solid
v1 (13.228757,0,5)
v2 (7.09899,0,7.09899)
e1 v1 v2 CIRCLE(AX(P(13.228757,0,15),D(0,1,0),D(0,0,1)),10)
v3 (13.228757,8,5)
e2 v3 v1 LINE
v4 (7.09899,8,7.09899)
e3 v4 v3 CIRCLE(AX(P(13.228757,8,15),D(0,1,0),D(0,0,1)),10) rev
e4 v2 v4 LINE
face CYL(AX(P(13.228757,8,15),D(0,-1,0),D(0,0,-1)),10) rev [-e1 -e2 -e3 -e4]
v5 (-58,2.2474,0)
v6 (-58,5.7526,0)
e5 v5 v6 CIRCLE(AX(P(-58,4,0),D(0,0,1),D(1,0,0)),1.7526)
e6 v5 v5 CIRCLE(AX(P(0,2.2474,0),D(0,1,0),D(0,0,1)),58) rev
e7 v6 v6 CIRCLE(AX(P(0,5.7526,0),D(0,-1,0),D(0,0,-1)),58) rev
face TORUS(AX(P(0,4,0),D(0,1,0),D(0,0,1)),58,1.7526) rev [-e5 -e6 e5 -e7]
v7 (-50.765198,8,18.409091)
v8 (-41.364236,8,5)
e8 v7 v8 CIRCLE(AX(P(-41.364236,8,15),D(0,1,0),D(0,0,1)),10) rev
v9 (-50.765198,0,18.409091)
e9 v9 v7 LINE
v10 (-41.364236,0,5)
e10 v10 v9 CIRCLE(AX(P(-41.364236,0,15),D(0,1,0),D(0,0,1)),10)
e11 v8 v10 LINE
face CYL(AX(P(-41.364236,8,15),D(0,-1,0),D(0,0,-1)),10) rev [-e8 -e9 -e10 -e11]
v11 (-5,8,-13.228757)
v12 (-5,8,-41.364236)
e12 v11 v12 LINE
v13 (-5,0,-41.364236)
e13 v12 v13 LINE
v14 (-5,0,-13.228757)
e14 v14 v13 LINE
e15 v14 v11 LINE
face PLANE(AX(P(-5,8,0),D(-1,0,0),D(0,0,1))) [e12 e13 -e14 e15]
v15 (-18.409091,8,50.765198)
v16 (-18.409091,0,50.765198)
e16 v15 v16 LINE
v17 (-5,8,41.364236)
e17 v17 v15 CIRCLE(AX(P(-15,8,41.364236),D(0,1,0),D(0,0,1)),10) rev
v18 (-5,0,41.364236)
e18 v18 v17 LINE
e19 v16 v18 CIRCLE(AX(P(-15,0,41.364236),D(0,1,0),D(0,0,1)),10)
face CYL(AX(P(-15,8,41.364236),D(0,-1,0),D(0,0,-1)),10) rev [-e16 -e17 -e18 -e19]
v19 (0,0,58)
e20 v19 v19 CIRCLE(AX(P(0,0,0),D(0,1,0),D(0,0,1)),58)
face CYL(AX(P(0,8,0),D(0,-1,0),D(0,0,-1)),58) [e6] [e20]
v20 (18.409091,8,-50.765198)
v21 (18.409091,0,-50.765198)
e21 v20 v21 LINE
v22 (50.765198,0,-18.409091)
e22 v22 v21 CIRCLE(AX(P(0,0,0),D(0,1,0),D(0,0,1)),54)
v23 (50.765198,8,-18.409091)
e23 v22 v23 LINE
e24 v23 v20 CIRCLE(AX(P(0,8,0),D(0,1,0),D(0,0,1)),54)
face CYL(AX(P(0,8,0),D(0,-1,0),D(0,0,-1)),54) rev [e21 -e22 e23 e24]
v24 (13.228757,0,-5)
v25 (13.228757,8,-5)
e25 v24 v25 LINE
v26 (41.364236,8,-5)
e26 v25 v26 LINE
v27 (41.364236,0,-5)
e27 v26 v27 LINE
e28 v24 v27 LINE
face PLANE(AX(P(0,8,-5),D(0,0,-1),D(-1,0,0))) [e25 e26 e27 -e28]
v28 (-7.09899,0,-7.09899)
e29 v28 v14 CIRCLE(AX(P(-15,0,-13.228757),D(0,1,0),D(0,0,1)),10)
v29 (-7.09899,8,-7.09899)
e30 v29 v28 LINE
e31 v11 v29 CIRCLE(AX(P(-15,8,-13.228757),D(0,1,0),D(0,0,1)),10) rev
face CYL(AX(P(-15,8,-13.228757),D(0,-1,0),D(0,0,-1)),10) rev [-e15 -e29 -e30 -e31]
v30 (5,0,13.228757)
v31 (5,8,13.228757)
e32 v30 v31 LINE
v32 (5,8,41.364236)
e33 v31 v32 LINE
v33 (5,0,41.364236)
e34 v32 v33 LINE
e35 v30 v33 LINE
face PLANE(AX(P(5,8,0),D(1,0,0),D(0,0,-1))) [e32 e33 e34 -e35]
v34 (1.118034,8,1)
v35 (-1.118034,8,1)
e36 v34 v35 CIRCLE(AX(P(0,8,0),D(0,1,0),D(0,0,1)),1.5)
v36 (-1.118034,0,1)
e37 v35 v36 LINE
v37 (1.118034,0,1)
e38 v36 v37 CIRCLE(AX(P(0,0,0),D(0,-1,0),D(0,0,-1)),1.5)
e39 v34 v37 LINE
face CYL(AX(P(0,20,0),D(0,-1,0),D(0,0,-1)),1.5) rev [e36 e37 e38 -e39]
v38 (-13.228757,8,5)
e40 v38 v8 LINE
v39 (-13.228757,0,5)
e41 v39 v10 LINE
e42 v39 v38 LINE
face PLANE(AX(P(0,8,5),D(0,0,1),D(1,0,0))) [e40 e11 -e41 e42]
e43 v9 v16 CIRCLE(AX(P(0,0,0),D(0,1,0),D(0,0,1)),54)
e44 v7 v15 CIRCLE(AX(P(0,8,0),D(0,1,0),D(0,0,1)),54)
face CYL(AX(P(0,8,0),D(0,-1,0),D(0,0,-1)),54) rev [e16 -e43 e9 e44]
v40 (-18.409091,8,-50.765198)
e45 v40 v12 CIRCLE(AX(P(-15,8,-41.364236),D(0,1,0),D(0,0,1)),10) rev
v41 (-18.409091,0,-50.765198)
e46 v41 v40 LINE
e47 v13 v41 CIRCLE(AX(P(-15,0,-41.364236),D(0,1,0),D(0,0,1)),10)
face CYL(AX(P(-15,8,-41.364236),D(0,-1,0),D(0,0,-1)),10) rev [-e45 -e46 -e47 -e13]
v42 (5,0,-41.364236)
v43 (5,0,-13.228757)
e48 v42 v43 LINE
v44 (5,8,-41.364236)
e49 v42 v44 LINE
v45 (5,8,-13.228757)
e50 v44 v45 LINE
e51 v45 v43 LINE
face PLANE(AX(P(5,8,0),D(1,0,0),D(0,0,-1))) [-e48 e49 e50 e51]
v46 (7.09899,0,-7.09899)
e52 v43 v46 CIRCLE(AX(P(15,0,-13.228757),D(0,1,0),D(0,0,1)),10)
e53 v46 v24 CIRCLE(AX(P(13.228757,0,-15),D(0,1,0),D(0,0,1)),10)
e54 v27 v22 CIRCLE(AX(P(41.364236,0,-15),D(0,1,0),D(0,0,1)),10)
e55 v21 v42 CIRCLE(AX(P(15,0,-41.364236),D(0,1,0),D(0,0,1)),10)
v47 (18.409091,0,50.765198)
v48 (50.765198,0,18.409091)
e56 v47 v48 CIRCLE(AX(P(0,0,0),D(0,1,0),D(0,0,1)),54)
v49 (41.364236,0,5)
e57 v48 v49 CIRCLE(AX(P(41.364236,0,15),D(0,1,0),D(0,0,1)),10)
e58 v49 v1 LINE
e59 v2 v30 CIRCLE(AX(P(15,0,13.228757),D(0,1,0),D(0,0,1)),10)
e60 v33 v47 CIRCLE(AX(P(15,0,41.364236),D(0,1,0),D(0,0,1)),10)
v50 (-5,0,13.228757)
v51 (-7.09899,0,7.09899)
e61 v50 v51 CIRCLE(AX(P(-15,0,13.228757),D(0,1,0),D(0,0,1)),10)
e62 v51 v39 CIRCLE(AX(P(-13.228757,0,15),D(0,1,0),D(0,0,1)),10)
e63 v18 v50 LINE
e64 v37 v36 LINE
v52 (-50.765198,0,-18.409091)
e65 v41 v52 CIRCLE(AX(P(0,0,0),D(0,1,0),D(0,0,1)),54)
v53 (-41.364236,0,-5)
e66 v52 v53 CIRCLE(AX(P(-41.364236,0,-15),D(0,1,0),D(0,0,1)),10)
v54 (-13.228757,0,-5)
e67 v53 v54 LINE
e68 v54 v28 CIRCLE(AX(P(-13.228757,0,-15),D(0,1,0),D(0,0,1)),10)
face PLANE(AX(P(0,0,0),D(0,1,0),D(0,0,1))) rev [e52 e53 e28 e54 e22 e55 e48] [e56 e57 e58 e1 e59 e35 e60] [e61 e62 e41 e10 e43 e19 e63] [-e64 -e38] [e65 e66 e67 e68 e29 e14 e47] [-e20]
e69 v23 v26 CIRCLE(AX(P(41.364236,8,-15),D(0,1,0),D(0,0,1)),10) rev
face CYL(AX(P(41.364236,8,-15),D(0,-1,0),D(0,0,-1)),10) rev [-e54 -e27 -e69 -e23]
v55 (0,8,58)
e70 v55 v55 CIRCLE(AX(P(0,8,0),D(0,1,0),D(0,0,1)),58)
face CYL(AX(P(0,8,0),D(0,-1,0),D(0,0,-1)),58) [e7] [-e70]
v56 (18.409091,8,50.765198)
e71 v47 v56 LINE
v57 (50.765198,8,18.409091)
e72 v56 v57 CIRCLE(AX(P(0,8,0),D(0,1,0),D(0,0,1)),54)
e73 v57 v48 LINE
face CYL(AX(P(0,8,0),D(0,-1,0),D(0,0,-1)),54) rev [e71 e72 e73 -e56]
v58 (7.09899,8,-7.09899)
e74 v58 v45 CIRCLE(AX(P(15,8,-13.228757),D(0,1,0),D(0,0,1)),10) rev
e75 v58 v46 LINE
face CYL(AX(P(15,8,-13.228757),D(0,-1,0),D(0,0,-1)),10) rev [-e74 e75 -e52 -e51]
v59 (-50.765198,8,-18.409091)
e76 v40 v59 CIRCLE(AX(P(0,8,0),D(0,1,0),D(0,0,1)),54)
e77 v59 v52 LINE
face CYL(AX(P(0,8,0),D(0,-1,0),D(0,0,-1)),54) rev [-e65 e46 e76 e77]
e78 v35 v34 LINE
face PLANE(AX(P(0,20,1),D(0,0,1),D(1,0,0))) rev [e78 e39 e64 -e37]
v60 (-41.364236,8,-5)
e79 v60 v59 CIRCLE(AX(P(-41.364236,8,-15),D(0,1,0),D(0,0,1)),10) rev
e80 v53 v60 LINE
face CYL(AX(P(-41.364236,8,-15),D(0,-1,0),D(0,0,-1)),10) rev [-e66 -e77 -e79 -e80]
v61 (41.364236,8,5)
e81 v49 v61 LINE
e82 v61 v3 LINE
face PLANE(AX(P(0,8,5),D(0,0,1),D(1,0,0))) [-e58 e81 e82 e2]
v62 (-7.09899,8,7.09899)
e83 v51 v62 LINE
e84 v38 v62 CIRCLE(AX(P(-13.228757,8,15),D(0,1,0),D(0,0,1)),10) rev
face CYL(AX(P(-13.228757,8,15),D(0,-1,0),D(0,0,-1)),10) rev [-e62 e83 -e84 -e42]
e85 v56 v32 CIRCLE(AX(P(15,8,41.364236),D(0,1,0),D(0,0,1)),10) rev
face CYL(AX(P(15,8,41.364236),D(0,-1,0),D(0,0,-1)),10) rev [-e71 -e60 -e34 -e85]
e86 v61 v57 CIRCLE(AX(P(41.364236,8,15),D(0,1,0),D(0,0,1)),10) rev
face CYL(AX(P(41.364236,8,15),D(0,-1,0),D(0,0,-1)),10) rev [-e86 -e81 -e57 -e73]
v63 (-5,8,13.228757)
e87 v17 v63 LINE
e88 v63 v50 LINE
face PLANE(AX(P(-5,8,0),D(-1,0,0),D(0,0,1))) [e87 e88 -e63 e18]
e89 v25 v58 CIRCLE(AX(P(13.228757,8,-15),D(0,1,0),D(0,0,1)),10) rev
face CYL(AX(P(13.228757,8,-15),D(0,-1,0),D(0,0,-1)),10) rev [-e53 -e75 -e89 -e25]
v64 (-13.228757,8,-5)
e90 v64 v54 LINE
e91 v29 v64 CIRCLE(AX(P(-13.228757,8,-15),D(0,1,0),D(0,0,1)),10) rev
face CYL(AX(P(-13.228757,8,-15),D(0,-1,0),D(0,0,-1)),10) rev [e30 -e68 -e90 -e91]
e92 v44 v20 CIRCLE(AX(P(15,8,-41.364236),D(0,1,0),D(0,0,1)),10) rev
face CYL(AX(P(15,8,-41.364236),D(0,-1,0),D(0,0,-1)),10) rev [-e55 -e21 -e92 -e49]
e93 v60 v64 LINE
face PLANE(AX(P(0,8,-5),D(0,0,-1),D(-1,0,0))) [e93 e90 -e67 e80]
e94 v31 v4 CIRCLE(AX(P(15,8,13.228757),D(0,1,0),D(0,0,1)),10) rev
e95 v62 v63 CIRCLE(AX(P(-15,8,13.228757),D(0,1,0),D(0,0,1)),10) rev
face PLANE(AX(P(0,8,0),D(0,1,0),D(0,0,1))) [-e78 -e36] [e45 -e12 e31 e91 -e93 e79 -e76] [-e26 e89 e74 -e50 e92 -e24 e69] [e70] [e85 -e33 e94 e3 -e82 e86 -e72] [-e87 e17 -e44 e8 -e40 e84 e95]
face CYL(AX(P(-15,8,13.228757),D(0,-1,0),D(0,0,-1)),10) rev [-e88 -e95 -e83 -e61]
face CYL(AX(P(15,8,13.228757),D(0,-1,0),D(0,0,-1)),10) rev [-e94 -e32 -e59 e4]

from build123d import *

# Parameters (mm, degrees)
SKETCH_1_R          = 58
EXTRUDE_1_DEPTH     = 8
FILLET_1_R          = 10
FILLET_2_R          = 10
SKETCH_6_R          = 1.7526
CUT_EXTRUDE_1_DEPTH = 20


with BuildPart() as part:
    # 草图1 → 凸台-拉伸1 (new body)
    with BuildSketch(Plane(origin=(0, 0, 0), x_dir=(1, 0, 0), z_dir=(0, 1, 0))):
        with Locations(Location((0, 0, 0), (0, 0, 270))):
            Circle(SKETCH_1_R)
        with BuildLine():
            Line((-5, 53.768020235), (-5, 8.660254038))
            ThreePointArc((-5, 8.660254038), (-7.071067812, 7.071067812), (-8.660254038, 5))
            Line((-8.660254038, 5), (-53.768020235, 5))
            ThreePointArc((-53.768020235, 5), (-38.183766184, 38.183766184), (-5, 53.768020235))
        make_face(mode=Mode.SUBTRACT)
        with BuildLine():
            Line((-53.768020235, -5), (-8.660254038, -5))
            ThreePointArc((-8.660254038, -5), (-7.071067812, -7.071067812), (-5, -8.660254038))
            Line((-5, -8.660254038), (-5, -53.768020235))
            ThreePointArc((-5, -53.768020235), (-38.183766184, -38.183766184), (-53.768020235, -5))
        make_face(mode=Mode.SUBTRACT)
        with BuildLine():
            Line((5, -53.768020235), (5, -8.660254038))
            ThreePointArc((5, -8.660254038), (7.071067812, -7.071067812), (8.660254038, -5))
            Line((8.660254038, -5), (53.768020235, -5))
            ThreePointArc((53.768020235, -5), (38.183766184, -38.183766184), (5, -53.768020235))
        make_face(mode=Mode.SUBTRACT)
        with BuildLine():
            Line((53.768020235, 5), (8.660254038, 5))
            ThreePointArc((8.660254038, 5), (7.071067812, 7.071067812), (5, 8.660254038))
            Line((5, 8.660254038), (5, 53.768020235))
            ThreePointArc((5, 53.768020235), (38.183766184, 38.183766184), (53.768020235, 5))
        make_face(mode=Mode.SUBTRACT)
    extrude(amount=EXTRUDE_1_DEPTH)

    # 圆角1
    fillet_1_edges = [part.edges().sort_by_distance(p)[0] for p in [
        (53.768020235, 4, 5),
        (5, 4, 53.768020235),
        (53.768020235, 4, -5),
        (5, 4, -53.768020235),
        (-5, 4, -53.768020235),
        (-53.768020235, 4, -5),
        (-53.768020235, 4, 5),
        (-5, 4, 53.768020235),
    ]]
    fillet(fillet_1_edges, radius=FILLET_1_R)

    # 圆角2
    # the kernel refuses this fillet: 10 mm, written as the material it adds along each edge
    with BuildSketch(Plane(origin=(5, 0, -8.660254038), x_dir=(0, 0, -1), z_dir=(0, 1, 0)), Plane(origin=(-5, 0, 8.660254038), x_dir=(0, 0, 1), z_dir=(0, 1, 0)), Plane(origin=(-8.660254038, 0, -5), x_dir=(-1, 0, 0), z_dir=(0, 1, 0))) as fillet_2_piece_1:
        with BuildLine():
            CenterArc((4.568502517, -10), FILLET_2_R, 90, 41.409622109)
            ThreePointArc((-2.04587576, -2.5), (-0.921320126, -1.33315892), (0, 0))
            Line((0, 0), (4.568502517, 0))
        make_face()
    extrude(amount=8)
    with BuildSketch(Plane(origin=(8.660254038, 0, -5), x_dir=(1, 0, 0), z_dir=(0, 1, 0)), Plane(origin=(5, 0, 8.660254038), x_dir=(0, 0, 1), z_dir=(0, 1, 0)), Plane(origin=(-8.660254038, 0, 5), x_dir=(-1, 0, 0), z_dir=(0, 1, 0)), Plane(origin=(-5, 0, -8.660254038), x_dir=(0, 0, -1), z_dir=(0, 1, 0))) as fillet_2_piece_2:
        with BuildLine():
            CenterArc((4.568502517, 10), FILLET_2_R, 228.590377891, 41.409622109)
            ThreePointArc((-2.04587576, 2.5), (-0.921320126, 1.33315892), (0, 0))
            Line((0, 0), (4.568502517, 0))
        make_face()
    extrude(amount=8)
    with BuildSketch(Plane(origin=(8.660254038, 0, 5), x_dir=(-0.6333158920043416, 0, 0.7738933911946432), z_dir=(0, 1, 0))) as fillet_2_piece_3:
        with BuildLine():
            CenterArc((4.845628665, 9.868692826), FILLET_2_R, 219.295188945, 41.409622109)
            Line((-2.893305247, 3.535533906), (0, 0))
            ThreePointArc((0, 0), (1.615209555, 0.131307174), (3.23041911, 0))
        make_face()
    extrude(amount=8)

    # 切除-扫描1: sweep along a path in 草图5
    with BuildLine(Plane(origin=(0, 4, 0), x_dir=(1, 0, 0), z_dir=(0, 1, 0))) as sweep_1_path:
        CenterArc((0, 0), 58, 0, 360)
    # 草图6 → 切除-扫描1 (sweep, cut)
    with BuildSketch(Plane.XY):
        with Locations((-58, 4)):
            Circle(SKETCH_6_R)
    sweep(path=sweep_1_path.line, mode=Mode.SUBTRACT)

    # 草图7 → 切除-拉伸1 (cut)
    with BuildSketch(Plane(origin=(0, 0, 0), x_dir=(-1, 0, 0), z_dir=(0, -1, 0))):
        with BuildLine():
            Line((-1.118033989, -1), (-0.213422781, -1))
            Line((-0.213422781, -1), (1.118033989, -1))
            ThreePointArc((1.118033989, -1), (1.401258538, -0.535233135), (1.5, 0))
            ThreePointArc((1.5, 0), (-0.535233135, 1.401258538), (-1.118033989, -1))
        make_face()
    extrude(amount=-CUT_EXTRUDE_1_DEPTH, mode=Mode.SUBTRACT)


solid = part.part
